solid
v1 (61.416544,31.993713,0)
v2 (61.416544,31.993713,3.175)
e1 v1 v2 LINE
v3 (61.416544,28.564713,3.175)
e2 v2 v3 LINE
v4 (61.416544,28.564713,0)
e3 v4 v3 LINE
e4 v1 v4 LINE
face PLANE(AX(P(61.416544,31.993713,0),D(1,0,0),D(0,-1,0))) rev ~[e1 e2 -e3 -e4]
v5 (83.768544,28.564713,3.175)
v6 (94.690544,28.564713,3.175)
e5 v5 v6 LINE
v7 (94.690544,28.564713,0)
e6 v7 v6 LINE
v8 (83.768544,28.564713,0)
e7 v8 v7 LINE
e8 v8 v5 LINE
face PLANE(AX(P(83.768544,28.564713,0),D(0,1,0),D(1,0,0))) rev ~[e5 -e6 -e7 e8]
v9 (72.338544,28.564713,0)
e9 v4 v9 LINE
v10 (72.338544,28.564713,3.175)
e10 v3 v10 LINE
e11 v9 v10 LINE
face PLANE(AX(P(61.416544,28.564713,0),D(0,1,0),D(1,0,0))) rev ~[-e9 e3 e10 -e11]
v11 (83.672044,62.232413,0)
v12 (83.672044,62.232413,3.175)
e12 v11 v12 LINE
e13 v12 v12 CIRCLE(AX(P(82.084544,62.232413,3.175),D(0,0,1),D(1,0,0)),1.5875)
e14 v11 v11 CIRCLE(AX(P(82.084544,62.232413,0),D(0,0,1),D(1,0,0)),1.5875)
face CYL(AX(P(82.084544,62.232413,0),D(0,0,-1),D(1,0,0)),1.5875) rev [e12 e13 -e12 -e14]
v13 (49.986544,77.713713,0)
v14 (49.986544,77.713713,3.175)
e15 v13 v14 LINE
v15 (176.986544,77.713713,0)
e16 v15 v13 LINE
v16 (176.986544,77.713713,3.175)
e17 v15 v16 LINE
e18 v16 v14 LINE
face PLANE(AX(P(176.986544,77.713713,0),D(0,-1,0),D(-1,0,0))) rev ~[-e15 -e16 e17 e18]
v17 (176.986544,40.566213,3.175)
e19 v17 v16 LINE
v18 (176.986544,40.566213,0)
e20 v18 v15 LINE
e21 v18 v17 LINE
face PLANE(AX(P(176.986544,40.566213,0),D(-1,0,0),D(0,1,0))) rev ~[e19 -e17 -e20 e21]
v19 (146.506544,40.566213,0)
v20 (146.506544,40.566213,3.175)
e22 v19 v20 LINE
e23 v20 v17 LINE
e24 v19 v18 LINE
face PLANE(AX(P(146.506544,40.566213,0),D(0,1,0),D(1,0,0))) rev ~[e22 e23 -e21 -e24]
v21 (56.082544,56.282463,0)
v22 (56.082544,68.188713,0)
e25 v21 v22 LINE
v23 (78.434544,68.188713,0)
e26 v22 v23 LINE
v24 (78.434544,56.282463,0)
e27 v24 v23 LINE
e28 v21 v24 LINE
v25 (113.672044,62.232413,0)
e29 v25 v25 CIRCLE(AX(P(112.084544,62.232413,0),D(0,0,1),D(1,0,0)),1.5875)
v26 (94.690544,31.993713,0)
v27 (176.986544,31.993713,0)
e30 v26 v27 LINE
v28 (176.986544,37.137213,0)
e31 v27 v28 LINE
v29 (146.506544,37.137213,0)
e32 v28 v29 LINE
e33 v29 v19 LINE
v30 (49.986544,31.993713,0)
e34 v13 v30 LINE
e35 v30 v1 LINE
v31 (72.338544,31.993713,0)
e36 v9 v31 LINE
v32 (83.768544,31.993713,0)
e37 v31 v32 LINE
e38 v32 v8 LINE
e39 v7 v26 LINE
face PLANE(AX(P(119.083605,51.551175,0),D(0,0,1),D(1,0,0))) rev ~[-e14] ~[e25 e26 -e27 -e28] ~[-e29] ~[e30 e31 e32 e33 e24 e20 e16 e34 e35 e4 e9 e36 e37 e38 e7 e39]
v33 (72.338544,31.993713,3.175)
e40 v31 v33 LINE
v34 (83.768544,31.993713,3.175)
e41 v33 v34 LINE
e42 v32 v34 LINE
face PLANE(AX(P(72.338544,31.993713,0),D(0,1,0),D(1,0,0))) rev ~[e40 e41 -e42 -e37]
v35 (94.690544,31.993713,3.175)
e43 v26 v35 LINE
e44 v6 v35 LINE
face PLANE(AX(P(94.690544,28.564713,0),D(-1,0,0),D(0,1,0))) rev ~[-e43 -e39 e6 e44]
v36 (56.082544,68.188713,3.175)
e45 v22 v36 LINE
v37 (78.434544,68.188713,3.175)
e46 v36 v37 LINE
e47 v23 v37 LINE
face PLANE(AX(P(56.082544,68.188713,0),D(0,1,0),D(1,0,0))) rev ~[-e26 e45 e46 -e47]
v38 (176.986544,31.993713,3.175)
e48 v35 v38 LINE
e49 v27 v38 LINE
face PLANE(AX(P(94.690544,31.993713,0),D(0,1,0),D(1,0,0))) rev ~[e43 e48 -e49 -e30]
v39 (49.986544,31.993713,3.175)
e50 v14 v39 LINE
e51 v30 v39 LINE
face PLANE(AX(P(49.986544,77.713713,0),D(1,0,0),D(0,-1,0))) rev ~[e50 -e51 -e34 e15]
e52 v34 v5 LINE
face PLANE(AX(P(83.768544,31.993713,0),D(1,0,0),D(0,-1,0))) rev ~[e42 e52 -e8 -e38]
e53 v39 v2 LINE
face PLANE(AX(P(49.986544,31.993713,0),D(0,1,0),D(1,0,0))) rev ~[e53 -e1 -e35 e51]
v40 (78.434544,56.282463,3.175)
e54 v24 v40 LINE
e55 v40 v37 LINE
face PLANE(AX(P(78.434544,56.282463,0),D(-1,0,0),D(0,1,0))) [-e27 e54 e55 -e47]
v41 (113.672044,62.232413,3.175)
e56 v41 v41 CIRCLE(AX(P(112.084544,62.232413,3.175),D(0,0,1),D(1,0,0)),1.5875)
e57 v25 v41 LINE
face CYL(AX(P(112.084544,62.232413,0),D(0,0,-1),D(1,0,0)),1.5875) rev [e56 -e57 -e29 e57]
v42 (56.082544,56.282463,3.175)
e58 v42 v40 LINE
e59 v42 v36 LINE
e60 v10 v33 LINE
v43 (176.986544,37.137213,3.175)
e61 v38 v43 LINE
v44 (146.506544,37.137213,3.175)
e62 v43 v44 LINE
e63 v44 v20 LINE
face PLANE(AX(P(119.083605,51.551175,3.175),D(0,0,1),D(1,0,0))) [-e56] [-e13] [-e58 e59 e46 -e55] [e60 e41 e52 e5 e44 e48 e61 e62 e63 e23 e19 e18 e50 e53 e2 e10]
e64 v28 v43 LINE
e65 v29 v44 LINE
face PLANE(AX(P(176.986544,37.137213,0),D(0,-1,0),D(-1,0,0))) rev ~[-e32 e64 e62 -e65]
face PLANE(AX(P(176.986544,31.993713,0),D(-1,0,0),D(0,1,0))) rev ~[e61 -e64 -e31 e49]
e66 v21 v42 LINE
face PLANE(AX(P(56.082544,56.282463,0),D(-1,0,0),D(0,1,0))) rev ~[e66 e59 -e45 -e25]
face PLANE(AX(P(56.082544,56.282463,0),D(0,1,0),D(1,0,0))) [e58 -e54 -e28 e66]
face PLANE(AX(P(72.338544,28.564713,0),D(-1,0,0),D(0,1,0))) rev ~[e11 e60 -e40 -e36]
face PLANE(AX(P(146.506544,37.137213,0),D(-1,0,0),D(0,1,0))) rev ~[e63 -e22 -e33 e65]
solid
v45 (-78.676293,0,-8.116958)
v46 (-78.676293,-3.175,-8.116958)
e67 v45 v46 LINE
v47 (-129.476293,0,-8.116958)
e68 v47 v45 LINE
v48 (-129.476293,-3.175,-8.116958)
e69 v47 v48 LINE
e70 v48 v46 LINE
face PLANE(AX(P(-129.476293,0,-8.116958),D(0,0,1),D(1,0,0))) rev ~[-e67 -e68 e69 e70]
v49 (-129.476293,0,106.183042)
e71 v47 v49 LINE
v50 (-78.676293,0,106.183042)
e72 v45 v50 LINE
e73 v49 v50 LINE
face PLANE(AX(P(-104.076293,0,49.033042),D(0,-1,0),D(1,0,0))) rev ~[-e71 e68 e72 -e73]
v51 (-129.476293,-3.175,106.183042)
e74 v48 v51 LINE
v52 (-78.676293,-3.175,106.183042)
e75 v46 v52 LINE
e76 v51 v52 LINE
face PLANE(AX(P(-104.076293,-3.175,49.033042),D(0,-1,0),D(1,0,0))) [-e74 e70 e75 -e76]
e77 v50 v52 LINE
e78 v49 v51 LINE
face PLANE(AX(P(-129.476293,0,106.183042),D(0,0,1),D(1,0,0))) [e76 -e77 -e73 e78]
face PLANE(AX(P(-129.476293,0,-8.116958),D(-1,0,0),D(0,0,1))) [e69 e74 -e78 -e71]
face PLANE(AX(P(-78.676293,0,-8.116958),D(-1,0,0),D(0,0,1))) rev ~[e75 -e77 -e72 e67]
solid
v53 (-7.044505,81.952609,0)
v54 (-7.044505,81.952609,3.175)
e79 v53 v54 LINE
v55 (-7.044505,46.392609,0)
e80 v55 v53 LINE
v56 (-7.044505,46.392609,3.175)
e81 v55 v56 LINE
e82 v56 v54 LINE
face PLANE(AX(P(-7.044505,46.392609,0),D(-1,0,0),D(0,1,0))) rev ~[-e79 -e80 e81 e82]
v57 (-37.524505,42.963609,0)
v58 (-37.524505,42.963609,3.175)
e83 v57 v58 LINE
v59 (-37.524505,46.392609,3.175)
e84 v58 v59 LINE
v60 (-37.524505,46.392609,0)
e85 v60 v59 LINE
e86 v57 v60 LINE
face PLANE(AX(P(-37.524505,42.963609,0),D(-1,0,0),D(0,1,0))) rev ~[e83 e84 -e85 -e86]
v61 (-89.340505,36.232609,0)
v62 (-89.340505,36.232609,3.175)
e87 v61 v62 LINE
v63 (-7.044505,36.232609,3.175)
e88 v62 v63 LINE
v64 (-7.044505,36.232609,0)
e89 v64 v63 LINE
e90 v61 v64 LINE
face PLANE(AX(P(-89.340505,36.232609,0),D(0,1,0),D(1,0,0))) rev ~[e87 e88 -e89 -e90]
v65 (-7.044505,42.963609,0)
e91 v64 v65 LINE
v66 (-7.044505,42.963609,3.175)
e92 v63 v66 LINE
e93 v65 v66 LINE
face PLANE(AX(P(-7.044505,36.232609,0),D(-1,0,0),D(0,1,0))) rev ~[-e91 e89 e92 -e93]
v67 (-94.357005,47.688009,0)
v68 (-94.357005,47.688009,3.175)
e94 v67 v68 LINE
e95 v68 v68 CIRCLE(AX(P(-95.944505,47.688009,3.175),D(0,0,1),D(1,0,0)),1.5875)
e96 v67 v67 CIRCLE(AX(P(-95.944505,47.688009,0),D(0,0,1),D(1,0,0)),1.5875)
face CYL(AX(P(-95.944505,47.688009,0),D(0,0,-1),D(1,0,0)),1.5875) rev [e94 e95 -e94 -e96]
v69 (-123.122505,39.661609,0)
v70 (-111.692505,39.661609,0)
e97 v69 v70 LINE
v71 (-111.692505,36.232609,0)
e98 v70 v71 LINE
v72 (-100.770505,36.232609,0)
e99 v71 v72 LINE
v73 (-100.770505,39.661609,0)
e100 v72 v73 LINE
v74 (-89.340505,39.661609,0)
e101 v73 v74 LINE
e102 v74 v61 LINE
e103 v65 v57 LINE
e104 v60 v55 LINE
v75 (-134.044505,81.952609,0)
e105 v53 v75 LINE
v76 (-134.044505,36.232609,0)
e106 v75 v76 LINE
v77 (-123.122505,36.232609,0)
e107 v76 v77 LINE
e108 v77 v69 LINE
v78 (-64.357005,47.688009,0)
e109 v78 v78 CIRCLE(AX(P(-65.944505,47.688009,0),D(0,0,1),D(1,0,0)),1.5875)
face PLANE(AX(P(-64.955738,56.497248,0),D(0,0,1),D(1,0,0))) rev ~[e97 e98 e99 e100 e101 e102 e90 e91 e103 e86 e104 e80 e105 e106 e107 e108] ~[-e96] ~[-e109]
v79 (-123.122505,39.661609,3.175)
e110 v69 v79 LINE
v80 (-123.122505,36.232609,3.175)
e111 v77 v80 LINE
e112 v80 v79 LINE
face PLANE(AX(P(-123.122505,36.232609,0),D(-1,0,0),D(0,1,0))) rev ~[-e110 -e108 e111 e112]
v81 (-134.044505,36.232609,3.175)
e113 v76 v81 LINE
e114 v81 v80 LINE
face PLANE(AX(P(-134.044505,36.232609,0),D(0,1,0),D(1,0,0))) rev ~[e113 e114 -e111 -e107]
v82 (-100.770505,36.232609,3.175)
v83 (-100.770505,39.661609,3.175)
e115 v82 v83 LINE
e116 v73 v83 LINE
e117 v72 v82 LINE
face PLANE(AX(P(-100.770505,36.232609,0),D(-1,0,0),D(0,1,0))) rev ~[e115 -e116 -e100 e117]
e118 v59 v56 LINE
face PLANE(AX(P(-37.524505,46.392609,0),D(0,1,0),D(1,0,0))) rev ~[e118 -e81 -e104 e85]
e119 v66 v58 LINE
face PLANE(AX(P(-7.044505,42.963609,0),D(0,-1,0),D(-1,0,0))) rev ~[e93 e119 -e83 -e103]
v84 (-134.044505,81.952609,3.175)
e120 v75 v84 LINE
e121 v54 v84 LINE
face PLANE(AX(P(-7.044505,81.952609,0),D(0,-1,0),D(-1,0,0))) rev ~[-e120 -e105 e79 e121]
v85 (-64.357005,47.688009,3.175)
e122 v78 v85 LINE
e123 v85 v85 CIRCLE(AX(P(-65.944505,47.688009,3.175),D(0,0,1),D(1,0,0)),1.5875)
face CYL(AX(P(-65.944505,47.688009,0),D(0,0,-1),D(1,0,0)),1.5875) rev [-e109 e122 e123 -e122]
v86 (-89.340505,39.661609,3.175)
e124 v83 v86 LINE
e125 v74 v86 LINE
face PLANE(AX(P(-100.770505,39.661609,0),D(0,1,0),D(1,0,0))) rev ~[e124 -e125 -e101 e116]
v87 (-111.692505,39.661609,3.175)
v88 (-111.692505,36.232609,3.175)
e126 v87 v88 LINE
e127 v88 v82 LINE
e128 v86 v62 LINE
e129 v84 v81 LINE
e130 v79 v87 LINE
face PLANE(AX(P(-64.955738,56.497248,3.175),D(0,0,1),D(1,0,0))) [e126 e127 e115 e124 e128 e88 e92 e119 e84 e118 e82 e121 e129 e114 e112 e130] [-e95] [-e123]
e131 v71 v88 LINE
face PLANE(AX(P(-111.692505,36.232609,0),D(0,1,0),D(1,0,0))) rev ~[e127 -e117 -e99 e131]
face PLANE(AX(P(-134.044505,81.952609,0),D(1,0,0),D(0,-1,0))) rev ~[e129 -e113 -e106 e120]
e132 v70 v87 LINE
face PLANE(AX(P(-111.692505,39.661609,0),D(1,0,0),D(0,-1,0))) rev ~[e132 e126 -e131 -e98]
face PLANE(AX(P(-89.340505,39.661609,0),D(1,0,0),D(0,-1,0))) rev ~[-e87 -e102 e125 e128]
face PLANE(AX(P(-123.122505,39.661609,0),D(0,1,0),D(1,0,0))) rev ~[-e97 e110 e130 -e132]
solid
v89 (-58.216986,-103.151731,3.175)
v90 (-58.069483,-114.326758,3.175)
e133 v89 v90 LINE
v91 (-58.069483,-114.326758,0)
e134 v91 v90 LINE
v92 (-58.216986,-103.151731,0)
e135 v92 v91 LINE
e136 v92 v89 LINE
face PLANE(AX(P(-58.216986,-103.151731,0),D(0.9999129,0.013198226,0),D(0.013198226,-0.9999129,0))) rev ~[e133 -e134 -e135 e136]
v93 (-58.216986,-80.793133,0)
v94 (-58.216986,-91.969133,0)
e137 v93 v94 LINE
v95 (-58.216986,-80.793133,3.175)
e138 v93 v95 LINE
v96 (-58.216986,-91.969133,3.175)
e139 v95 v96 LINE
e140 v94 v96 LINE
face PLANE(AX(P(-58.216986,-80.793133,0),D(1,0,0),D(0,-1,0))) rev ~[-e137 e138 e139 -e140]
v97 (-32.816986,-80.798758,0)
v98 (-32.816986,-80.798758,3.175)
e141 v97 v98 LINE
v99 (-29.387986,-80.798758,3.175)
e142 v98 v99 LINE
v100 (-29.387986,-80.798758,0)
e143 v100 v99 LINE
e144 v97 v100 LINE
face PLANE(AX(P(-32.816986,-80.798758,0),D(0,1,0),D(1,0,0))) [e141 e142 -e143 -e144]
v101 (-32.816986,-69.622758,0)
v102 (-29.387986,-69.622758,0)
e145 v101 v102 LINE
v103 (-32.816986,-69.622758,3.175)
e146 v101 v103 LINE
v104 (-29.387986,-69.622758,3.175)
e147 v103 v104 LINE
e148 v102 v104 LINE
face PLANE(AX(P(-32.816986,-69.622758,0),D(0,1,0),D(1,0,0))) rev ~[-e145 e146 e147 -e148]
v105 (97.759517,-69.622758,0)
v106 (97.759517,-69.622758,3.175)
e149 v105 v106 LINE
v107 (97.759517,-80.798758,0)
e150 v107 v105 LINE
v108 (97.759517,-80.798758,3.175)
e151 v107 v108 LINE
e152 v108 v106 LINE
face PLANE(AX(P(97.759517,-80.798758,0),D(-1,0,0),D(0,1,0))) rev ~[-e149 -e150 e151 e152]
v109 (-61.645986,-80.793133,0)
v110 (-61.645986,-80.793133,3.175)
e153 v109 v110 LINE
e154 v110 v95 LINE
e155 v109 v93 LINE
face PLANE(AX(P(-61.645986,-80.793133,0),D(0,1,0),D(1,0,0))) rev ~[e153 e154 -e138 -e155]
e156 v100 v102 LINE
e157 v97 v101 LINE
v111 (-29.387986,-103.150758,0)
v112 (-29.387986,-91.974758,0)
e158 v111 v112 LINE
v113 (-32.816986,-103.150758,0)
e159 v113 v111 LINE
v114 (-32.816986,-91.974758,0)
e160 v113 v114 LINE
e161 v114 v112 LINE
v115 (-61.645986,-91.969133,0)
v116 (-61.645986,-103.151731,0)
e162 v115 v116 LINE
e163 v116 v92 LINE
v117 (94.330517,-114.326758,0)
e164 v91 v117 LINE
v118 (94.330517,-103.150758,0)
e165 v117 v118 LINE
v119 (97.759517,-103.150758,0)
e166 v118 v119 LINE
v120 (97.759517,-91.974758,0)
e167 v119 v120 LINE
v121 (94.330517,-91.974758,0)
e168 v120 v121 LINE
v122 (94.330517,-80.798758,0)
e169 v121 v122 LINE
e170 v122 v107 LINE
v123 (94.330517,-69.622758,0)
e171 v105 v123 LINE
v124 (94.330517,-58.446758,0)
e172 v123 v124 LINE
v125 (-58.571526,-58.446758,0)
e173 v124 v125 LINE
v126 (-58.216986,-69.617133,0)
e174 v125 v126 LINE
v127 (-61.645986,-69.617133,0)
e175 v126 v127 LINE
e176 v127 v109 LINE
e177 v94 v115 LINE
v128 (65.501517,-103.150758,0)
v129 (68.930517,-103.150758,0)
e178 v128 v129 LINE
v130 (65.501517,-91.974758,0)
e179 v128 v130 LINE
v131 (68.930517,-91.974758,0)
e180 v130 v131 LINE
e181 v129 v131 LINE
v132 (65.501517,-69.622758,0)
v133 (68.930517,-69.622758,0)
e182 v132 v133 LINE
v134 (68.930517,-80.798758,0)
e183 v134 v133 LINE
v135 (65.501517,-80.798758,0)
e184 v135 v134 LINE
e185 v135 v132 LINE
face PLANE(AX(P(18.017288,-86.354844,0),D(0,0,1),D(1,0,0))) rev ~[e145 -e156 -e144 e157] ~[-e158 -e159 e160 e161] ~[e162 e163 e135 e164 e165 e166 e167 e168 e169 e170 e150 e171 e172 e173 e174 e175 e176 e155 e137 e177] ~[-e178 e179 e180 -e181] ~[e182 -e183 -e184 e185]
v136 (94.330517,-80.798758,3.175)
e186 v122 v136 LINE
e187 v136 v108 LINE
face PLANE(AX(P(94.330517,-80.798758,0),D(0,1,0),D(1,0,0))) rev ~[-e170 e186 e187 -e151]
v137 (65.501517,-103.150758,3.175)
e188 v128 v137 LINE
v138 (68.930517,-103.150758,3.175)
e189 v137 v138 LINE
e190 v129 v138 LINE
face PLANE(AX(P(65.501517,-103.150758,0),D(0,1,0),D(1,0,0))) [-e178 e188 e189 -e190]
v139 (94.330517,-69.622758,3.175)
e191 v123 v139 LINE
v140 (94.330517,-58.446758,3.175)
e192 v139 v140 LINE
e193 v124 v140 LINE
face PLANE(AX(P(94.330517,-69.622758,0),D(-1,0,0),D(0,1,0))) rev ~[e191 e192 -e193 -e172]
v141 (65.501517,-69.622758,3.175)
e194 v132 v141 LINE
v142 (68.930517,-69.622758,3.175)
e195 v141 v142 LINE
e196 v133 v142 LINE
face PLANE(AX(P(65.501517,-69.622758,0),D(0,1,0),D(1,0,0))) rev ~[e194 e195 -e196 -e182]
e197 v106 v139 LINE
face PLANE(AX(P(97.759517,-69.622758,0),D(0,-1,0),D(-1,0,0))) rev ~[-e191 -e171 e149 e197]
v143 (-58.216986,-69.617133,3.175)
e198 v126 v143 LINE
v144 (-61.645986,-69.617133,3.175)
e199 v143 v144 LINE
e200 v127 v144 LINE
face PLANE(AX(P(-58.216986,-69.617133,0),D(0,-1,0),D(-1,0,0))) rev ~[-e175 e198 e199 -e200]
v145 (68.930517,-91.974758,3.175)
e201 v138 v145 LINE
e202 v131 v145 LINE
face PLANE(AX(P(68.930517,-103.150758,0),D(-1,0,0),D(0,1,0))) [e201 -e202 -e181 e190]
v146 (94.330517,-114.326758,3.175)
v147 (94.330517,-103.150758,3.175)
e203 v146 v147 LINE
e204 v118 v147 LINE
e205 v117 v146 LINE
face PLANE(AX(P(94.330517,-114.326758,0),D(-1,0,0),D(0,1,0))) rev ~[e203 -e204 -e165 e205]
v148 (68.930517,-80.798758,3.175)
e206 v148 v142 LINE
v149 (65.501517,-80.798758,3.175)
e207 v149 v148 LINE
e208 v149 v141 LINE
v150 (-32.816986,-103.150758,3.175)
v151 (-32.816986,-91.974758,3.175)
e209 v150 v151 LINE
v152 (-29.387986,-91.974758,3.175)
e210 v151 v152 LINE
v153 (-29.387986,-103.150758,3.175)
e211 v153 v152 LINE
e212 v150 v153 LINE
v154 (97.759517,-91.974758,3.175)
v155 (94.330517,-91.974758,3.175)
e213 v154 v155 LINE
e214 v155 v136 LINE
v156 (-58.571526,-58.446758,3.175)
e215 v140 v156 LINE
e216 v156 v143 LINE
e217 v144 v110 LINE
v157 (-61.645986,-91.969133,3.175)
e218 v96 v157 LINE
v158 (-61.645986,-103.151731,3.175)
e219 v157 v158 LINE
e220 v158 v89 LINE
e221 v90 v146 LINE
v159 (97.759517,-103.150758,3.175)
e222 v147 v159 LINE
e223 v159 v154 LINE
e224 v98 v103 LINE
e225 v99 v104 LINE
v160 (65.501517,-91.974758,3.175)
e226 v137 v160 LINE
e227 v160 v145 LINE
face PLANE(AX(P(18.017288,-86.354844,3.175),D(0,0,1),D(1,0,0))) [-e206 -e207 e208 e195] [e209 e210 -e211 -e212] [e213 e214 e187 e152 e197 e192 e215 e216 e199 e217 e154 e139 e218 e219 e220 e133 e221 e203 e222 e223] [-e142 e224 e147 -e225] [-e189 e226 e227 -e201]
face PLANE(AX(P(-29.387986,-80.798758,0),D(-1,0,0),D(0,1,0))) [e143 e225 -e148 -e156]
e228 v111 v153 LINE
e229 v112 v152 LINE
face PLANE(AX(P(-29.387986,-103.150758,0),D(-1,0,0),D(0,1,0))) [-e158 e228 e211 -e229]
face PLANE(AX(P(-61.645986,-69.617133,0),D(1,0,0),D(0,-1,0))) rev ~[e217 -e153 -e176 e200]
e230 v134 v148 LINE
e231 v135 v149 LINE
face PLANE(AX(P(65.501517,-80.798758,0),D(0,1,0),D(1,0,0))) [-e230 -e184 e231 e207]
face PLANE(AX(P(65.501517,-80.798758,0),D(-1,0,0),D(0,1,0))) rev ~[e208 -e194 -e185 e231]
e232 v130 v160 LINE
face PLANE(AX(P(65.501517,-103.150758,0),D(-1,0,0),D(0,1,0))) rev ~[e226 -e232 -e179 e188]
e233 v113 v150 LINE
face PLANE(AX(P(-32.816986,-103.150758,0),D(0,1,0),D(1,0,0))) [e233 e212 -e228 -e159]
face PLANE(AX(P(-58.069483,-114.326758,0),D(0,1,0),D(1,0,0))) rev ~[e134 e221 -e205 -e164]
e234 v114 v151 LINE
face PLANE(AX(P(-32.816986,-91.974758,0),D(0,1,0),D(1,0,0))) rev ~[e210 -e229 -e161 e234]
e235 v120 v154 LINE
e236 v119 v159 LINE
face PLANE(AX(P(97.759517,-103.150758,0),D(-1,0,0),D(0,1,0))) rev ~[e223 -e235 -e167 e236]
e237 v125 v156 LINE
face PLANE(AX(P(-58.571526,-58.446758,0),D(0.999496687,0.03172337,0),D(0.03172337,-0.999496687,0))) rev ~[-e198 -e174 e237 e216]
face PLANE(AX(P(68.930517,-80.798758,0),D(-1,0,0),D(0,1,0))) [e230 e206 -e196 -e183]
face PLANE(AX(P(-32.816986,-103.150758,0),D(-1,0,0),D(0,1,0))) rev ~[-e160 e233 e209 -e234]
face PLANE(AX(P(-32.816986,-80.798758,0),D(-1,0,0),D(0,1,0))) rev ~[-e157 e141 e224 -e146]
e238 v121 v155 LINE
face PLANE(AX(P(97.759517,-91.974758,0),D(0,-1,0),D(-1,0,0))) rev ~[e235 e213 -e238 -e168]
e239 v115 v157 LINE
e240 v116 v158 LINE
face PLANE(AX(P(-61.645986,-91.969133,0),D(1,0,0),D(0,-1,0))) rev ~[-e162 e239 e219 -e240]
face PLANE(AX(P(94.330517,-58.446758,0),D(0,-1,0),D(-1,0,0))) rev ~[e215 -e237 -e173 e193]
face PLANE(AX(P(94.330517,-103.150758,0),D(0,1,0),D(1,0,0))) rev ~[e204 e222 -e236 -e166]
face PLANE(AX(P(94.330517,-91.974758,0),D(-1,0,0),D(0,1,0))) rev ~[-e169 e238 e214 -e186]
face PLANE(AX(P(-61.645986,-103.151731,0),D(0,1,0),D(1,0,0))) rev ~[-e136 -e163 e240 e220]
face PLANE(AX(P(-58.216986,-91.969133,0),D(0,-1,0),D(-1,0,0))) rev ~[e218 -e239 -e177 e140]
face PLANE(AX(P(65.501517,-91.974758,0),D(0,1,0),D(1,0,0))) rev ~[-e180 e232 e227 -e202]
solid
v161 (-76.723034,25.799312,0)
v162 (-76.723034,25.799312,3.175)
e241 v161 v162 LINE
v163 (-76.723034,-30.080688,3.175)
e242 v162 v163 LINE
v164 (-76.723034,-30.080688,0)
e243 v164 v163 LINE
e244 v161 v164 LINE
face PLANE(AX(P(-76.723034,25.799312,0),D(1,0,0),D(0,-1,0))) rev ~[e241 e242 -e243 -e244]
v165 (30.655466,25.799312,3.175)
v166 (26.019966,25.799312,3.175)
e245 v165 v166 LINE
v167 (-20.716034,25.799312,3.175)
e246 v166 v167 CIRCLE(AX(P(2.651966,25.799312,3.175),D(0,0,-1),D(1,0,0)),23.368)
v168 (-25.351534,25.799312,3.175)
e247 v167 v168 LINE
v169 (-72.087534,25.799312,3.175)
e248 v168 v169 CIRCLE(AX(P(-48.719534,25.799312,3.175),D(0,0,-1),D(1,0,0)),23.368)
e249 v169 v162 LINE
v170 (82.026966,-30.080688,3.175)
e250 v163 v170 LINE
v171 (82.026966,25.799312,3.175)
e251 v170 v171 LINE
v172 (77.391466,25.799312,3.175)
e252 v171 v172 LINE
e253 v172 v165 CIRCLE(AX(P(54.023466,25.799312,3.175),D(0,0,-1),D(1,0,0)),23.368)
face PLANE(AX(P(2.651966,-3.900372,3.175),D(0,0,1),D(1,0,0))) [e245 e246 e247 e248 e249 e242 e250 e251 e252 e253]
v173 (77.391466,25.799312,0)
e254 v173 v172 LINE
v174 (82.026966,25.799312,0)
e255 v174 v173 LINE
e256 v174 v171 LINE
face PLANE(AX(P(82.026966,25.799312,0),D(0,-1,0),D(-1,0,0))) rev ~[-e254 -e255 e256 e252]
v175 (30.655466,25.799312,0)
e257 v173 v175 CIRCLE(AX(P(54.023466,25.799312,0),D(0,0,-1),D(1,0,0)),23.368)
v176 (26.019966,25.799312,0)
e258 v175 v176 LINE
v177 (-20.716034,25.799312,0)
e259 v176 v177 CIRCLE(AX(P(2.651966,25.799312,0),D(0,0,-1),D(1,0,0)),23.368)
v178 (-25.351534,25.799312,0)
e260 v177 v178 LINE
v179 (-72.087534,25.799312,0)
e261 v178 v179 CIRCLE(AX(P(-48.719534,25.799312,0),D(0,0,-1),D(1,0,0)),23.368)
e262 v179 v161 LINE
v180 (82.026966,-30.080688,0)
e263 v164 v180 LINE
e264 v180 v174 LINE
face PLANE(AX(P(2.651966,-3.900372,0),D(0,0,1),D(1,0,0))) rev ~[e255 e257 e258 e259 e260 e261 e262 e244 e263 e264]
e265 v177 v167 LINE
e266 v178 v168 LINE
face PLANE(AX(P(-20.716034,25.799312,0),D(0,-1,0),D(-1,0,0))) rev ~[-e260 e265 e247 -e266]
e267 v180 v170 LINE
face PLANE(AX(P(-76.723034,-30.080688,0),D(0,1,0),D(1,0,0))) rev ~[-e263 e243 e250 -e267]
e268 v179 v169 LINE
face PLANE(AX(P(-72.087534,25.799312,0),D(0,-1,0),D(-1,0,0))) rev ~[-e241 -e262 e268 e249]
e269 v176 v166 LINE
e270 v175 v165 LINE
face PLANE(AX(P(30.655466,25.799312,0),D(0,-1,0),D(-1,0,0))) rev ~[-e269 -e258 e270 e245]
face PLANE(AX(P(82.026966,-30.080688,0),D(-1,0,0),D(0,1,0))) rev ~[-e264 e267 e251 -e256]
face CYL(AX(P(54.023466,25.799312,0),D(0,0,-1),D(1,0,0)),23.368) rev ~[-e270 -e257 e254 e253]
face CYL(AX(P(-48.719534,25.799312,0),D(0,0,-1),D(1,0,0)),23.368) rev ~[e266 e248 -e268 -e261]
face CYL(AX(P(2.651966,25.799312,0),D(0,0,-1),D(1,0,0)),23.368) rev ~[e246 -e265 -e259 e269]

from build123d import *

# Parameters (mm, degrees)
F1_DEPTH = 3.175
F2_R     = 1.5875
F3_DEPTH = 3.175
F4_W     = 3.429
F4_H     = 11.176
F5_DEPTH = 3.175
F6_W     = 22.352
F6_H     = 11.90625
F6_R     = 1.5875
F7_DEPTH = 3.175
F8_W     = 50.8
F8_H     = 114.3
F9_DEPTH = 3.175


# Not quite as in the source:
# - a length typed as a fraction of an inch, garbled in the dataset ("3 / 203.2 mm" for 3/8 in), is restored


with BuildPart() as f1:
    # F0 (on Top) → F1 (new body)
    with BuildSketch(Plane.XY):
        with BuildLine():
            Line((-72.0875338231, 25.7993119954), (-76.7230338231, 25.7993119954))
            Line((-76.7230338231, 25.7993119954), (-76.7230338231, -30.0806880046))
            Line((-76.7230338231, -30.0806880046), (82.0269661769, -30.0806880046))
            Line((82.0269661769, -30.0806880046), (82.0269661769, 25.7993119954))
            Line((82.0269661769, 25.7993119954), (77.3914661769, 25.7993119954))
            ThreePointArc((77.3914661769, 25.7993119954), (54.0234661769, 2.4313119954), (30.6554661769, 25.7993119954))
            Line((30.6554661769, 25.7993119954), (26.0199661769, 25.7993119954))
            ThreePointArc((26.0199661769, 25.7993119954), (2.6519661769, 2.4313119954), (-20.7160338231, 25.7993119954))
            Line((-20.7160338231, 25.7993119954), (-25.3515338231, 25.7993119954))
            ThreePointArc((-25.3515338231, 25.7993119954), (-48.7195338231, 2.4313119954), (-72.0875338231, 25.7993119954))
        make_face()
    extrude(amount=F1_DEPTH)


with BuildPart() as f3:
    # F2 (on Top) → F3 (new body)
    with BuildSketch(Plane.XY):
        Polygon((-7.0445054214, 81.9526092303), (-134.0445054214, 81.9526092303), (-134.0445054214, 36.2326092303), (-123.1225054214, 36.2326092303), (-123.1225054214, 39.6616092303), (-111.6925054214, 39.6616092303), (-111.6925054214, 36.2326092303), (-100.7705054214, 36.2326092303), (-100.7705054214, 39.6616092303), (-89.3405054214, 39.6616092303), (-89.3405054214, 36.2326092303), (-78.4185054214, 36.2326092303), (-66.9885054214, 36.2326092303), (-7.0445054214, 36.2326092303), (-7.0445054214, 42.9636092303), (-37.5245054214, 42.9636092303), (-37.5245054214, 46.3926092303), (-7.0445054214, 46.3926092303), align=None)
        with Locations((-95.9445054214, 47.6880092303)):
            Circle(F2_R, mode=Mode.SUBTRACT)
        with Locations((-65.9445054214, 47.6880092303)):
            Circle(F2_R, mode=Mode.SUBTRACT)
    extrude(amount=F3_DEPTH)


with BuildPart() as f5:
    # F4 (on Top) → F5 (new body)
    with BuildSketch(Plane.XY):
        Polygon((94.330517361, -58.446758062), (-58.5715263949, -58.446758062), (-58.2169860113, -69.6171330385), (-61.6459860113, -69.6171330385), (-61.6459860113, -80.7931330385), (-58.2169860113, -80.7931330385), (-58.2169860113, -91.9691330385), (-61.6459860113, -91.9691330385), (-61.6459860113, -103.1517314958), (-58.2169860113, -103.1517314958), (-58.069482639, -114.326758062), (94.330517361, -114.326758062), (94.330517361, -103.150758062), (97.759517361, -103.150758062), (97.759517361, -91.974758062), (94.330517361, -91.974758062), (94.330517361, -80.798758062), (97.759517361, -80.798758062), (97.759517361, -69.622758062), (94.330517361, -69.622758062), align=None)
        with Locations((-31.1024860113, -97.562758062)):
            Rectangle(F4_W, F4_H, mode=Mode.SUBTRACT)
        with Locations((67.216017361, -97.562758062)):
            Rectangle(F4_W, F4_H, mode=Mode.SUBTRACT)
        with Locations((-31.1024860113, -75.210758062)):
            Rectangle(F4_W, F4_H, mode=Mode.SUBTRACT)
        with Locations((67.216017361, -75.210758062)):
            Rectangle(F4_W, F4_H, mode=Mode.SUBTRACT)
    extrude(amount=F5_DEPTH)


with BuildPart() as f7:
    # F6 (on Top) → F7 (new body)
    with BuildSketch(Plane.XY):
        Polygon((176.9865440756, 77.7137125557), (49.9865440756, 77.7137125557), (49.9865440756, 31.9937125557), (61.4165440756, 31.9937125557), (61.4165440756, 28.5647125557), (72.3385440756, 28.5647125557), (72.3385440756, 31.9937125557), (83.7685440756, 31.9937125557), (83.7685440756, 28.5647125557), (94.6905440756, 28.5647125557), (94.6905440756, 31.9937125557), (176.9865440756, 31.9937125557), (176.9865440756, 37.1372125557), (146.5065440756, 37.1372125557), (146.5065440756, 40.5662125557), (176.9865440756, 40.5662125557), align=None)
        with Locations((67.2585440756, 62.2355875557)):
            Rectangle(F6_W, F6_H, mode=Mode.SUBTRACT)
        with Locations((82.0845440756, 62.2324125557)):
            Circle(F6_R, mode=Mode.SUBTRACT)
        with Locations((112.0845440756, 62.2324125557)):
            Circle(F6_R, mode=Mode.SUBTRACT)
    extrude(amount=F7_DEPTH)


with BuildPart() as f9:
    # F8 (on Front) → F9 (new body)
    with BuildSketch(Plane.XZ):
        with Locations((-104.0762934036, 49.0330420434)):
            Rectangle(F8_W, F8_H)
    extrude(amount=F9_DEPTH)


solid = Compound([f1.part, f3.part, f5.part, f7.part, f9.part])
